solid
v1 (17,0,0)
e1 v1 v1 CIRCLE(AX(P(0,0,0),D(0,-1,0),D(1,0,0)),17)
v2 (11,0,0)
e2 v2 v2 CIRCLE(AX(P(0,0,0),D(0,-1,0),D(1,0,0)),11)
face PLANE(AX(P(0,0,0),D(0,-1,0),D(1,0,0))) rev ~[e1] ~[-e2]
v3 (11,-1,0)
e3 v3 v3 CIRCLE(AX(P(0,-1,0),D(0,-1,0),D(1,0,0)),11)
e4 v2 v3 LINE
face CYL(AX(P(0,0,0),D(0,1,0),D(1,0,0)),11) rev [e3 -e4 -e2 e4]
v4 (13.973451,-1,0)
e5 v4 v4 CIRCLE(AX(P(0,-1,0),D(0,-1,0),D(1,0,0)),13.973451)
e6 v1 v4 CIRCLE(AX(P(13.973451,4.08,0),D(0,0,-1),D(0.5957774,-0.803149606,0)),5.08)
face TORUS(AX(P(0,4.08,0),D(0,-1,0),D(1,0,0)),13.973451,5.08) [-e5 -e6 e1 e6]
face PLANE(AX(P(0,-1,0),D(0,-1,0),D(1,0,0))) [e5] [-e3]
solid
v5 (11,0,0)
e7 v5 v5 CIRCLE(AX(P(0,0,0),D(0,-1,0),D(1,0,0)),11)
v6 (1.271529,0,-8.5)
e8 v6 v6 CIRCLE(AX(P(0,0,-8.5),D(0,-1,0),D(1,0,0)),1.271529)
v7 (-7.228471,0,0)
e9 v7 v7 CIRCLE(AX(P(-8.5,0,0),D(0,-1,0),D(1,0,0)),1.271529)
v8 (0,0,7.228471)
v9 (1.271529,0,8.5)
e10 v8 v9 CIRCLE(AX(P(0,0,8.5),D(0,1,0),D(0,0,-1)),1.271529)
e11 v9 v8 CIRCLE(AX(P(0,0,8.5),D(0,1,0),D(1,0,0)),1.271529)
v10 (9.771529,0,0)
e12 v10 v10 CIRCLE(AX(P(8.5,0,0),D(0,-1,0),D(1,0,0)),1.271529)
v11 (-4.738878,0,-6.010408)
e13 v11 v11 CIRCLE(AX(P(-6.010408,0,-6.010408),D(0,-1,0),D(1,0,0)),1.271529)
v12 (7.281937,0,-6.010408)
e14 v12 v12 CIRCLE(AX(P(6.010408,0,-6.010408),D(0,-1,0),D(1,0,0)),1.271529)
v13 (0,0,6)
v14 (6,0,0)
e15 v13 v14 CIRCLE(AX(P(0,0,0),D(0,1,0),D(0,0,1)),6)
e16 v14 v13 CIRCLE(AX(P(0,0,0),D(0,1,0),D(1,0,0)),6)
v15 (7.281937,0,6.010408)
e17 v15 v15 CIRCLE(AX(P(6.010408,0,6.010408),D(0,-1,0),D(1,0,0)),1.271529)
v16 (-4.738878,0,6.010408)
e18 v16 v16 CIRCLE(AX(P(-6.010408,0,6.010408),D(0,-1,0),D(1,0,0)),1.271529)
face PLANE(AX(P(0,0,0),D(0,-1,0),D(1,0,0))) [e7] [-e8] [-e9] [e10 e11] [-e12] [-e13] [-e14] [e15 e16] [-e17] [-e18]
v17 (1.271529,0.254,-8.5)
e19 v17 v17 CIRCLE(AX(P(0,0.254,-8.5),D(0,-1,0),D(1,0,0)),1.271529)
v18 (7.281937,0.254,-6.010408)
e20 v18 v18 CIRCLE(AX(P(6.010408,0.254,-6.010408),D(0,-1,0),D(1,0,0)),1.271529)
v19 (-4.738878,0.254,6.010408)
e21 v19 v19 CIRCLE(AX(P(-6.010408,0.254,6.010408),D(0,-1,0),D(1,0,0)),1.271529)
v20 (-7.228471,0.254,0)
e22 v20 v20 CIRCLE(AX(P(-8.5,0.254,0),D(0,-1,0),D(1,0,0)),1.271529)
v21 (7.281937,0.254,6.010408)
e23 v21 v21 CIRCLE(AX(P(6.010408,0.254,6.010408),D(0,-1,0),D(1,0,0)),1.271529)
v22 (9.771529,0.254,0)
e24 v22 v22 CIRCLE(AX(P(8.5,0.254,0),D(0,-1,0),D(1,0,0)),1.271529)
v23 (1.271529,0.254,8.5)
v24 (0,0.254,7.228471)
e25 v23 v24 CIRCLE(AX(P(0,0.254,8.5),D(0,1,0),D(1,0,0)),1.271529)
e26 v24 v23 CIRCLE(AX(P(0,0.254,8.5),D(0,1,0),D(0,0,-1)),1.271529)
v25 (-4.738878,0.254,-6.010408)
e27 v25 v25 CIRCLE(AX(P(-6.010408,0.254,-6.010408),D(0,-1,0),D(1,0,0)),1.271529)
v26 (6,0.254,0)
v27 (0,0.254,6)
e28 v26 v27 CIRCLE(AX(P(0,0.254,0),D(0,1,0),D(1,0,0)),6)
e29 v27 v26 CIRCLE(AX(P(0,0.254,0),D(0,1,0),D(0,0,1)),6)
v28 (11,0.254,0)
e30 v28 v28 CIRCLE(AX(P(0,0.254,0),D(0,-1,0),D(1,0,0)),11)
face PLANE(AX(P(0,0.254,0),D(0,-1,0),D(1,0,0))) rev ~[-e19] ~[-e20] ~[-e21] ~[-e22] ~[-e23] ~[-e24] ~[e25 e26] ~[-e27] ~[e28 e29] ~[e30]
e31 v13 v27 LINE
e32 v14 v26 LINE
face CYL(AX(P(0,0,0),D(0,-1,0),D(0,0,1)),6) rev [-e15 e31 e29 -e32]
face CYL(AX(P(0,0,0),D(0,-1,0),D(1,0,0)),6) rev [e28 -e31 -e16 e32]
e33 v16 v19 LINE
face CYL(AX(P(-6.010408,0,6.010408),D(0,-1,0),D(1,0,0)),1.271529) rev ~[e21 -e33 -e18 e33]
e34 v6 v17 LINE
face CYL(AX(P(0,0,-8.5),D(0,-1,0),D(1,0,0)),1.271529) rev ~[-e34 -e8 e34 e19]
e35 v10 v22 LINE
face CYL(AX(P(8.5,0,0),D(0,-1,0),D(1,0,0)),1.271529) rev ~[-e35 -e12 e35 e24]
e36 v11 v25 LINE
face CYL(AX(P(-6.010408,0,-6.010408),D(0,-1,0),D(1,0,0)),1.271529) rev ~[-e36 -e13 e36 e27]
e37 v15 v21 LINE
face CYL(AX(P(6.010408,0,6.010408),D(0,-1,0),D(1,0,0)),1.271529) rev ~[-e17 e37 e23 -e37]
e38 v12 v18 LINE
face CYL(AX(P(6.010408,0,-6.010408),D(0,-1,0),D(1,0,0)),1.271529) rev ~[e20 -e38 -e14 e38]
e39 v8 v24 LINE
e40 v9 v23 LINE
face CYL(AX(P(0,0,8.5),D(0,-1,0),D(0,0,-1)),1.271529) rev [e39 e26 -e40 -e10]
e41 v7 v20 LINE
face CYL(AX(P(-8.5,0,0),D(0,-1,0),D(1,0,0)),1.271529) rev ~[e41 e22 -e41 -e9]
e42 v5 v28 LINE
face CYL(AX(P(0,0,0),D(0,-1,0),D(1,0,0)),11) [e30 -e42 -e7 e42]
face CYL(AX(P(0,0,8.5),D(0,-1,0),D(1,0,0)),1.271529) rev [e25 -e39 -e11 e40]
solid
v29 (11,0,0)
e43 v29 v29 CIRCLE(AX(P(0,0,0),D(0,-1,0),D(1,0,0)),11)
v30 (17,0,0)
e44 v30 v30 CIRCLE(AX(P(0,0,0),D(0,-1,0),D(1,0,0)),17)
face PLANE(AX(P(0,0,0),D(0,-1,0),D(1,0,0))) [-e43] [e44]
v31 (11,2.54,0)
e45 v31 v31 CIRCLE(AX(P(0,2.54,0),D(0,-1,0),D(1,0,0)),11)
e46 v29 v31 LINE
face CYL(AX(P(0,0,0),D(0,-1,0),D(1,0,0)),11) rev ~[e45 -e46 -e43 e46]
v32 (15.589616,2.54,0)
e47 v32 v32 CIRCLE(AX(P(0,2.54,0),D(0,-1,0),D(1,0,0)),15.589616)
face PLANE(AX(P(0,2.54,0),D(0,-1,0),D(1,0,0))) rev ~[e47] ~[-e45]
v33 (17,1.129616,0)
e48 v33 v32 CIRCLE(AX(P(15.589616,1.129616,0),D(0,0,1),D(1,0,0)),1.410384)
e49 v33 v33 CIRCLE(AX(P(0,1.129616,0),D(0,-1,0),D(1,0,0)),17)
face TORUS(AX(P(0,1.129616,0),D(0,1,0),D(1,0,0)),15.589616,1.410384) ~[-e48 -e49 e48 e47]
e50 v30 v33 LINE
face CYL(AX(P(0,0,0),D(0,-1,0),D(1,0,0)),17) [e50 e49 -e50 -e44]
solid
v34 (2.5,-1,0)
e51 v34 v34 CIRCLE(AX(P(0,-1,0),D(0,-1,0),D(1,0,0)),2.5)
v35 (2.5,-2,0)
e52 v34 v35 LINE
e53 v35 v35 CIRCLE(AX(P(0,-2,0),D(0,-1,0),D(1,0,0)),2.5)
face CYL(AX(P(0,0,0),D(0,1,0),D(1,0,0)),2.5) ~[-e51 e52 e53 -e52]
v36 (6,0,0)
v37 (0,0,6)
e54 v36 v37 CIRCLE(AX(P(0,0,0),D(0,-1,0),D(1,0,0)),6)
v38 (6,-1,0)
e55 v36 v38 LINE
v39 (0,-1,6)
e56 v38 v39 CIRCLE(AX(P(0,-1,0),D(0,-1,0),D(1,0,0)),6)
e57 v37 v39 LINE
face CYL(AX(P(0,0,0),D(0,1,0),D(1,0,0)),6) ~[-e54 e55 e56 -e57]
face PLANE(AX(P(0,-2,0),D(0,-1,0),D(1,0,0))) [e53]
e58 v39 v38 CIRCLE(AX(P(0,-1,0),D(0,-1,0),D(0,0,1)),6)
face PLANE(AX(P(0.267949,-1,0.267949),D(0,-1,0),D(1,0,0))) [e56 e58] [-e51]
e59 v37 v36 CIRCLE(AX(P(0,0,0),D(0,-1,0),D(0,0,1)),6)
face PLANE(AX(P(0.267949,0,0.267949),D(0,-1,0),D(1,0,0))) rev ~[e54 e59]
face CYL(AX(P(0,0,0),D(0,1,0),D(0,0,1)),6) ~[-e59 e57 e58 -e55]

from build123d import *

# Parameters (mm, degrees)
F1_R     = 17
F1_R_2   = 11
F2_DEPTH = 1
F1_R_3   = 2.5
F3_DEPTH = 2
F1_R_4   = 1.2715293898
F4_DEPTH = 0.254
F6_DEPTH = 2.54
F7_R     = 1.4103835631


# Not quite as in the source:
# - a fillet or chamfer that OpenCascade refuses, or shapes differently, is made with other operations: its cross-section is extruded or revolved along the edge and cut away or added


with BuildPart() as f2:
    # F1 (on face) → F2 (new body)
    with BuildSketch(Plane.XZ):
        Circle(F1_R)
        Circle(F1_R_2, mode=Mode.SUBTRACT)
    extrude(amount=F2_DEPTH)

    # F5: fillet of radius 5.08 on 1 edges, made by hand

    # F5_s1 → F5_t2 (revolve, cut)
    with BuildSketch(Plane.XY):
        with BuildLine():
            ThreePointArc((17, 0), (15.567188555, -0.7435256815), (13.9734508099, -1))
            Line((13.9734508099, -1), (17, -1))
            Line((17, -1), (17, 0))
        make_face()
    revolve(axis=Axis((0, -1, 0), (0, -1, 0)), mode=Mode.SUBTRACT)


with BuildPart() as f2b:
    # F1 (on face) → F2, piece 2 (new body)
    with BuildSketch(Plane.XZ):
        with BuildLine():
            ThreePointArc((0, 6), (-4.2426406871, -4.2426406871), (6, 0))
            ThreePointArc((6, 0), (4.2426406871, 4.2426406871), (0, 6))
        make_face()
        Circle(F1_R_3, mode=Mode.SUBTRACT)
    extrude(amount=F2_DEPTH)

    # F1 (on face) → F3 (join)
    with BuildSketch(Plane.XZ):
        Circle(F1_R_3)
    extrude(amount=F3_DEPTH)


with BuildPart() as f4:
    # F1 (on face) → F4 (new body)
    with BuildSketch(Plane.XZ):
        Circle(F1_R_2)
        with Locations((-6.0104076401, -6.0104076401)):
            Circle(F1_R_4, mode=Mode.SUBTRACT)
        with Locations((0, -8.5)):
            Circle(F1_R_4, mode=Mode.SUBTRACT)
        with Locations((6.0104076401, -6.0104076401)):
            Circle(F1_R_4, mode=Mode.SUBTRACT)
        with Locations((-8.5, 0)):
            Circle(F1_R_4, mode=Mode.SUBTRACT)
        with Locations((-6.0104076401, 6.0104076401)):
            Circle(F1_R_4, mode=Mode.SUBTRACT)
        with BuildLine():
            ThreePointArc((0, 6), (4.2426406871, 4.2426406871), (6, 0))
            ThreePointArc((6, 0), (-4.2426406871, -4.2426406871), (0, 6))
        make_face(mode=Mode.SUBTRACT)
        with Locations((8.5, 0)):
            Circle(F1_R_4, mode=Mode.SUBTRACT)
        with BuildLine():
            ThreePointArc((1.2715293898, 8.5), (0.899107054, 7.600892946), (0, 7.2284706102))
            ThreePointArc((0, 7.2284706102), (-0.899107054, 9.399107054), (1.2715293898, 8.5))
        make_face(mode=Mode.SUBTRACT)
        with Locations((6.0104076401, 6.0104076401)):
            Circle(F1_R_4, mode=Mode.SUBTRACT)
    extrude(amount=-F4_DEPTH)


with BuildPart() as f6:
    # F1 (on face) → F6 (new body)
    with BuildSketch(Plane.XZ):
        Circle(F1_R)
        Circle(F1_R_2, mode=Mode.SUBTRACT)
    extrude(amount=-F6_DEPTH)

    # F7
    f7_edges = [f6.edges().sort_by_distance(p)[0] for p in [
        (-17, 2.54, 0),
    ]]
    fillet(f7_edges, radius=F7_R)


solid = Compound([f2.part, f2b.part, f4.part, f6.part])
